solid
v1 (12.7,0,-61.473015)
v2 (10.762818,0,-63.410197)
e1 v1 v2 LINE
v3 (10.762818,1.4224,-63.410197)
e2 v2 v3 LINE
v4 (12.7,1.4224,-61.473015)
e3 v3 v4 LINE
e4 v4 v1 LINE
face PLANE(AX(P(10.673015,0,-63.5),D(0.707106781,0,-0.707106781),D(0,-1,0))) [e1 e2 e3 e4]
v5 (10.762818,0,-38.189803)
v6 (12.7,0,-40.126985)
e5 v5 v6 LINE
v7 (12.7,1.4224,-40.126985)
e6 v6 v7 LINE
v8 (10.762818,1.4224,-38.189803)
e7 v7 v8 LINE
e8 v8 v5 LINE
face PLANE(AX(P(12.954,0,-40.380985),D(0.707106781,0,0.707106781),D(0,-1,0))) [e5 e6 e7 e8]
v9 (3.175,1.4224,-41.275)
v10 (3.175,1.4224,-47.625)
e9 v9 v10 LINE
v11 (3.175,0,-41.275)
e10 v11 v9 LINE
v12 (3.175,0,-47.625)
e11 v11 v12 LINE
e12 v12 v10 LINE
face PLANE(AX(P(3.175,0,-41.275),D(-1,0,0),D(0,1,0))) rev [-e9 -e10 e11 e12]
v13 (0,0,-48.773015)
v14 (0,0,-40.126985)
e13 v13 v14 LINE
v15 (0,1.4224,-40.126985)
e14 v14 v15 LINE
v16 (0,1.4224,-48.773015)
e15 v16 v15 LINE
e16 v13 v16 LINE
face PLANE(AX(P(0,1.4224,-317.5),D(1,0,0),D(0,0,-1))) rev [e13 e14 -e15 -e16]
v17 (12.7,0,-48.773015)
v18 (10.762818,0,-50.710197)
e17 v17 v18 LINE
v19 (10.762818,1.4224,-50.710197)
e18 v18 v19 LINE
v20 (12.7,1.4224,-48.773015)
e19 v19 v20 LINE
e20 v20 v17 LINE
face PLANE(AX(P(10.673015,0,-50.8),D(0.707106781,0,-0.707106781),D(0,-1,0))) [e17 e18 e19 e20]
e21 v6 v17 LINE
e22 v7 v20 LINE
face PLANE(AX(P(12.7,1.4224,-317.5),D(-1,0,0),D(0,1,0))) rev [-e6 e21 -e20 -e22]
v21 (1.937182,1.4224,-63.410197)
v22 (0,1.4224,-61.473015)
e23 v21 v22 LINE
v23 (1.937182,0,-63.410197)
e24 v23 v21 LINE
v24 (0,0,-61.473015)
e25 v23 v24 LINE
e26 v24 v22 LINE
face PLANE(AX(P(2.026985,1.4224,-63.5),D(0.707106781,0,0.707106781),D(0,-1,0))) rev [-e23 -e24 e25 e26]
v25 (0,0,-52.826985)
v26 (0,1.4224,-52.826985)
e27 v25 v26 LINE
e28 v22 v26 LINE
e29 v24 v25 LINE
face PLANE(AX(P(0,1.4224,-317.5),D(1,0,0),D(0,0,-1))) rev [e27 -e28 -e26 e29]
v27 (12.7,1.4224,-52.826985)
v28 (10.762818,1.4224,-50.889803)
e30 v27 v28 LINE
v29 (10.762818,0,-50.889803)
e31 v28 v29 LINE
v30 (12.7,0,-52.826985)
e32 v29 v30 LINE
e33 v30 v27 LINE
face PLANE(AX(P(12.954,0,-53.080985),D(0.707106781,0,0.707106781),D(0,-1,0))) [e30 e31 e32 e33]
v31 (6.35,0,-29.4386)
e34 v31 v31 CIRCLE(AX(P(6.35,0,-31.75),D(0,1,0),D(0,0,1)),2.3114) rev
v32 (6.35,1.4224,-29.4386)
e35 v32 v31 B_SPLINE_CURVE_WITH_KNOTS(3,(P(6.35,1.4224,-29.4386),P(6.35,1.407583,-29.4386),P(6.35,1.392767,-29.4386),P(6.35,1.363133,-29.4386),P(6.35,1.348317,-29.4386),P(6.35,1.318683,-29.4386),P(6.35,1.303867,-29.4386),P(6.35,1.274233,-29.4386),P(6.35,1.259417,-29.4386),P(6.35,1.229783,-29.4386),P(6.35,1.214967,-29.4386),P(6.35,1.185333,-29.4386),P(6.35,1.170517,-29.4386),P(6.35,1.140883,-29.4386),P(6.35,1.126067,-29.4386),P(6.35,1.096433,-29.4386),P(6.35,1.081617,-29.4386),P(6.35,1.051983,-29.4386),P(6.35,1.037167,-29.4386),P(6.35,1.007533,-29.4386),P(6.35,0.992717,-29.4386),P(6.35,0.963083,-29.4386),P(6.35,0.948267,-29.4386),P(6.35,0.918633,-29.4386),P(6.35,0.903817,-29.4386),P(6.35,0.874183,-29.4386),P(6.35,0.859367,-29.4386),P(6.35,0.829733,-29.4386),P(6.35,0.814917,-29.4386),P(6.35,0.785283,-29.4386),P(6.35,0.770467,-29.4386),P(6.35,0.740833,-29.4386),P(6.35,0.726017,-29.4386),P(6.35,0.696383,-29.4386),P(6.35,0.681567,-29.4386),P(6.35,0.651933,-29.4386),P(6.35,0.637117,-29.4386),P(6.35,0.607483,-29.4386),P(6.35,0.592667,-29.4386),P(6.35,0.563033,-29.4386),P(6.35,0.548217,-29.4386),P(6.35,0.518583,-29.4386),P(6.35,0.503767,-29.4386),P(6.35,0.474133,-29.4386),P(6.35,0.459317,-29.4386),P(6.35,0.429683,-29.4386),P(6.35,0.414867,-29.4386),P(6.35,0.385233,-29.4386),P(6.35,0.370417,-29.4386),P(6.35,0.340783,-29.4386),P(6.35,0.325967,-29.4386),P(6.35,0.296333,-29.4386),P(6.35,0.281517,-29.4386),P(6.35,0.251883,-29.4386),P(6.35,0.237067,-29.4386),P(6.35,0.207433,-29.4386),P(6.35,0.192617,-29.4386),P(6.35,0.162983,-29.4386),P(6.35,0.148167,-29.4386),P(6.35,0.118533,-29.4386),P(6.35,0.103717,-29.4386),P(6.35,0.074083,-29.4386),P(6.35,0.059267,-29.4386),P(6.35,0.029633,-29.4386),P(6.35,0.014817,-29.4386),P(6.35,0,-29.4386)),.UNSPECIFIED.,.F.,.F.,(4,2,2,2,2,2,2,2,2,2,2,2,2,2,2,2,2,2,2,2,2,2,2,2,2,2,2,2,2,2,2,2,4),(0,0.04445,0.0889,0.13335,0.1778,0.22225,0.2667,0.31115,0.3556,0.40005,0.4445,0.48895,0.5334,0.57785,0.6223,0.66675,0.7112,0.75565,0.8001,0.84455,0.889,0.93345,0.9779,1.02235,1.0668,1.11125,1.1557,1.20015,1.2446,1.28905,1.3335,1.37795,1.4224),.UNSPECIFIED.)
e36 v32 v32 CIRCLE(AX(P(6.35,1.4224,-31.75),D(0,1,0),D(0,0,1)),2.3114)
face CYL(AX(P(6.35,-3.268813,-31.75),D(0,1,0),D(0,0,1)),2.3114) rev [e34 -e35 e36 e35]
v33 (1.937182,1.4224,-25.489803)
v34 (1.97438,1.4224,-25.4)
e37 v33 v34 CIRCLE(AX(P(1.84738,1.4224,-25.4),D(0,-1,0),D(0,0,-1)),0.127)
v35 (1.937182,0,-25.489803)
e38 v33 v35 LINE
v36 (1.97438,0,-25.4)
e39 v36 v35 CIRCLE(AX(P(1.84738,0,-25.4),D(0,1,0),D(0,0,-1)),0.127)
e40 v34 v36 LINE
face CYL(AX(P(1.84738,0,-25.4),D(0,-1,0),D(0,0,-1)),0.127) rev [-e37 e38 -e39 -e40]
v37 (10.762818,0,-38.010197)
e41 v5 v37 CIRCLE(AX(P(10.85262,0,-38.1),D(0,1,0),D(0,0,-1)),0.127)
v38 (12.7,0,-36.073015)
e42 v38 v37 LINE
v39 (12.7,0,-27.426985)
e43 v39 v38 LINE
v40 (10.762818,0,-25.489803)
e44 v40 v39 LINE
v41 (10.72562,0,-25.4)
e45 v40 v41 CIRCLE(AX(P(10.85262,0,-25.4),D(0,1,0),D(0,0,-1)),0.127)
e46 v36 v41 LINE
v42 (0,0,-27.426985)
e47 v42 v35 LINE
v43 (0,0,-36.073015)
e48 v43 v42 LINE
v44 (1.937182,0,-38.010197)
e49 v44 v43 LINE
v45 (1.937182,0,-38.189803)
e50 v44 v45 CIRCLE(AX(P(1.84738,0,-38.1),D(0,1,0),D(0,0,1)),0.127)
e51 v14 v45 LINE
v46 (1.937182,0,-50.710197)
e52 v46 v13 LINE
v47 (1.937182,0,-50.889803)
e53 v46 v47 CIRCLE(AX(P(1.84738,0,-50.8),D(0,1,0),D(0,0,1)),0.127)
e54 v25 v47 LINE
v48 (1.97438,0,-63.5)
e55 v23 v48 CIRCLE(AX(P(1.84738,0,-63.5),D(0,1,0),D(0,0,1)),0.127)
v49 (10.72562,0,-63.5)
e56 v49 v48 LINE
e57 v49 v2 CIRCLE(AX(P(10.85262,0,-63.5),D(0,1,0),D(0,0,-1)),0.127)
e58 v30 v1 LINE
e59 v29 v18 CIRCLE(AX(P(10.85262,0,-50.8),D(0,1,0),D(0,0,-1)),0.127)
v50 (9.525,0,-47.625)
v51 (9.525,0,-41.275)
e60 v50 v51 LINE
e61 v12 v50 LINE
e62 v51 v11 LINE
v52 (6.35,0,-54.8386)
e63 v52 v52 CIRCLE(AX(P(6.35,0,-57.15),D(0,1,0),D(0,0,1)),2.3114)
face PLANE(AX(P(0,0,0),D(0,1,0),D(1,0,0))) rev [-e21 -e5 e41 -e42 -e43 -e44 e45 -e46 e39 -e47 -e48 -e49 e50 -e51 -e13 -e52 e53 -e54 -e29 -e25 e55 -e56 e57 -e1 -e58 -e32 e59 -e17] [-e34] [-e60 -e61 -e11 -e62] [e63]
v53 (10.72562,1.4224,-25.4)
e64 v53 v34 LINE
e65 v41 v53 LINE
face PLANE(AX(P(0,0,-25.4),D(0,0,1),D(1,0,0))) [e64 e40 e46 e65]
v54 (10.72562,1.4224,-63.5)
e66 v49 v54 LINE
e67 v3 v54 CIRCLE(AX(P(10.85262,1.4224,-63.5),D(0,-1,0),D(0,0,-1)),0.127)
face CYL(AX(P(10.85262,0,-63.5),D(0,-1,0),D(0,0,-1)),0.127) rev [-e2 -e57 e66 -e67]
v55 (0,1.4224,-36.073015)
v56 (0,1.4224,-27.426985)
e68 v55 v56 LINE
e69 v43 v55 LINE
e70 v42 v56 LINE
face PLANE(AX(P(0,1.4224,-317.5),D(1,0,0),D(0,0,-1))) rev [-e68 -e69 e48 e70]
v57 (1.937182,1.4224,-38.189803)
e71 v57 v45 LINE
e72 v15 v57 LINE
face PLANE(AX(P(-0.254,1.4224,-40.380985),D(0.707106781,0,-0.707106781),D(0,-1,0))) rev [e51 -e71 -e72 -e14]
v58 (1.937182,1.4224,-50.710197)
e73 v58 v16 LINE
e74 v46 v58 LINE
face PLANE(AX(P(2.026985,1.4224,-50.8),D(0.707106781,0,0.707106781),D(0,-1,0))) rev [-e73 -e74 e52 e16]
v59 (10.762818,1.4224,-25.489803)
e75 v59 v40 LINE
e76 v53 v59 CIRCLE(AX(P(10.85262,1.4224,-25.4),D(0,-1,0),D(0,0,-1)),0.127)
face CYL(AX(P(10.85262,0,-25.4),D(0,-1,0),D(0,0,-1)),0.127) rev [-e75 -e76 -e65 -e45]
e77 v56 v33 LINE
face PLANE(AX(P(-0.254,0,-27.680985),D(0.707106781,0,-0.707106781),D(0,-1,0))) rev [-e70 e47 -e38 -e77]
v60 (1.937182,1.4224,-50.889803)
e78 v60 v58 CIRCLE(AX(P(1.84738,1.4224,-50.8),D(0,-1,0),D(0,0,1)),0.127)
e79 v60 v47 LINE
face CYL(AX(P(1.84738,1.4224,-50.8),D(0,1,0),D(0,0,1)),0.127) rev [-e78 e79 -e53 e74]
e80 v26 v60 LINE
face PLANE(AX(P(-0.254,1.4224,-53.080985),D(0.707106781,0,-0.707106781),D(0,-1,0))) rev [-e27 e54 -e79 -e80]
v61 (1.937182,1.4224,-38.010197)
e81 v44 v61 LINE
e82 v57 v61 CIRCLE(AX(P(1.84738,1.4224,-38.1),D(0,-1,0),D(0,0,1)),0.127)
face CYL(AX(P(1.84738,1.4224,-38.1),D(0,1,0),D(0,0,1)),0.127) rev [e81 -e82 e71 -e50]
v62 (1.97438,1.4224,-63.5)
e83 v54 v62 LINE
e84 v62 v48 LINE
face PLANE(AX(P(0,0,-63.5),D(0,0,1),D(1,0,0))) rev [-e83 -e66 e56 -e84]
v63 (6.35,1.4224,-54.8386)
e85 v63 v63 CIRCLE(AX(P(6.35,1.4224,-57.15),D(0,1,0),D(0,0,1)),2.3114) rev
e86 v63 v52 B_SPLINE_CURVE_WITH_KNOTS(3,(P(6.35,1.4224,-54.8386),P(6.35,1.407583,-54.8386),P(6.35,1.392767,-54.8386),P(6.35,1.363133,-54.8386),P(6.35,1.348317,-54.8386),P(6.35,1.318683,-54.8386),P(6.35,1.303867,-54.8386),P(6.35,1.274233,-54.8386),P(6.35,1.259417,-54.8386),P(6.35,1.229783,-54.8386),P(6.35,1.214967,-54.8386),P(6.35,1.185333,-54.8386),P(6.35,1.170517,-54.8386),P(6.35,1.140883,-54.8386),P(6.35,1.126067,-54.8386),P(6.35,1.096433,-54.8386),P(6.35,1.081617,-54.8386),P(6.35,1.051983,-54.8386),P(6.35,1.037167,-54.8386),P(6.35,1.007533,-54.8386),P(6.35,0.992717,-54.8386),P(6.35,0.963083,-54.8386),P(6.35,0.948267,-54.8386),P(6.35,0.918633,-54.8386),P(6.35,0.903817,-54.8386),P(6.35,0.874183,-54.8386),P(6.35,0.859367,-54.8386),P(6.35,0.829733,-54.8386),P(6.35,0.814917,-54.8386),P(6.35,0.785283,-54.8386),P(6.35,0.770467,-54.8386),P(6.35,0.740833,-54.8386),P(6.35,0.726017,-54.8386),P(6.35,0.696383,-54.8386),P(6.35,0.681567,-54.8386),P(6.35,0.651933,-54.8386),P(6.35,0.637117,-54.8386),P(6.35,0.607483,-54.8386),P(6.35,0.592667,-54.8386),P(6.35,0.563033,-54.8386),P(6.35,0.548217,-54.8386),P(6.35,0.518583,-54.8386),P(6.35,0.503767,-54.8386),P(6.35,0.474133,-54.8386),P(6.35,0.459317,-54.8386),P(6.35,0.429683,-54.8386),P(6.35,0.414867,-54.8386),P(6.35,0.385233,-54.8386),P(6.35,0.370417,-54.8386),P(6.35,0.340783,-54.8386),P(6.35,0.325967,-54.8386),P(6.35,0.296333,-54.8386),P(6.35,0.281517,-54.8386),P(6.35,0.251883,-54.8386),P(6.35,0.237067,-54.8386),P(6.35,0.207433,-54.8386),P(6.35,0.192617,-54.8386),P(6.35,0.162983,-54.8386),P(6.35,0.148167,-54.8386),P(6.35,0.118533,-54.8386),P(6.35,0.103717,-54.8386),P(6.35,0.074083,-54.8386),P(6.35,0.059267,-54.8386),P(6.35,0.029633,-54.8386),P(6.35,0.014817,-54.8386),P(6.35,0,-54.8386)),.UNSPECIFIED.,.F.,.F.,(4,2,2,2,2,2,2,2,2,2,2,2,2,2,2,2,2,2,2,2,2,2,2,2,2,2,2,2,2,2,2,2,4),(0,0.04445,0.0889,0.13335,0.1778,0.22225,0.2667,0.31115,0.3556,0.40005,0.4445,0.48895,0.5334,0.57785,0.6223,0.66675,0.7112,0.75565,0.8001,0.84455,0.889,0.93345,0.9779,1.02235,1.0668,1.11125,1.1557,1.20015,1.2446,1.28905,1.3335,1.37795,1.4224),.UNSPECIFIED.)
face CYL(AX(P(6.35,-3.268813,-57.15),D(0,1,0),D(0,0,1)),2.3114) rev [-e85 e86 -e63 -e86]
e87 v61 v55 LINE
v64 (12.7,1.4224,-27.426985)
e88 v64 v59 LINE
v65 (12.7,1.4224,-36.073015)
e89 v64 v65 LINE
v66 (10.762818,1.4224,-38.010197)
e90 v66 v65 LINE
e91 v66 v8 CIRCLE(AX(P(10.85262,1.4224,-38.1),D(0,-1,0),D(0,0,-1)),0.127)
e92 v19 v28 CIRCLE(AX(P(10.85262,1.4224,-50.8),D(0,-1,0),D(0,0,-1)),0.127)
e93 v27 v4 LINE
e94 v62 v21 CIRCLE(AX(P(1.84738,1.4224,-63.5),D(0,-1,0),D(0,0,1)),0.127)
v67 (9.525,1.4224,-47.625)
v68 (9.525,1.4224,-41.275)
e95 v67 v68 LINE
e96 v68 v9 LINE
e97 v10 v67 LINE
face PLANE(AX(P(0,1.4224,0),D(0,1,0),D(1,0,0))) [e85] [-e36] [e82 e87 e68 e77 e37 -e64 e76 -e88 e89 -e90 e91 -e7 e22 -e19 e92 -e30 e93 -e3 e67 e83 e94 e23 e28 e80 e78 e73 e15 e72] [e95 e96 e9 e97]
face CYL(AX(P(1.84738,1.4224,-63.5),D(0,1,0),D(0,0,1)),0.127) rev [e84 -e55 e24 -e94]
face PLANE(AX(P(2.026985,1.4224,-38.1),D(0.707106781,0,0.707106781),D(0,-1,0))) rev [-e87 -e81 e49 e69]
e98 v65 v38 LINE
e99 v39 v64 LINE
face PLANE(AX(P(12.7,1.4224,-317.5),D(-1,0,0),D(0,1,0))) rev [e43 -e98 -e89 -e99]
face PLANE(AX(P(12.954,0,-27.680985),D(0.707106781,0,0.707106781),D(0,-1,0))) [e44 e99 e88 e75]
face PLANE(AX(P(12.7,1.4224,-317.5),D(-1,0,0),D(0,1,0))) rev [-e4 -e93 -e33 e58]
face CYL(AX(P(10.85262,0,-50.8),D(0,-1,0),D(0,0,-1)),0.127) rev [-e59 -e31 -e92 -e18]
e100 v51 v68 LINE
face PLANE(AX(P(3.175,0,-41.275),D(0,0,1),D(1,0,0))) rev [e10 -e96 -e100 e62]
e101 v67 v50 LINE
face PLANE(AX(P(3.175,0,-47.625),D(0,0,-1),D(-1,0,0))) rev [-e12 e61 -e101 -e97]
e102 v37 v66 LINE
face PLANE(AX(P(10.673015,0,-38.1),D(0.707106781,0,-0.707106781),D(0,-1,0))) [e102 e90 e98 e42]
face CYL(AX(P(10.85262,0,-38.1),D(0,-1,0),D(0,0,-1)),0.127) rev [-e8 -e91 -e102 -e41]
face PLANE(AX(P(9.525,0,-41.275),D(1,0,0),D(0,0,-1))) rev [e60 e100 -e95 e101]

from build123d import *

# Parameters (mm, degrees)
STOCK_HS_LOCK_BAR_3_LONG_1_OUTLINE_W = 6.35
STOCK_HS_LOCK_BAR_3_LONG_1_OUTLINE_H = 6.35
STOCK_HS_LOCK_BAR_3_LONG_1_DEPTH     = 1.4224
BOSS_EXTRUDE1_START                  = -1.4224
BOSS_EXTRUDE1_DEPTH                  = 1.4224


# Read off the part's stored shape, not the designer's step: Stock-HS lock bar 3 long-1
with BuildPart() as part:
    # Stock-HS lock bar 3 long-1 outline → Stock-HS lock bar 3 long-1 (new body)
    with BuildSketch(Plane(origin=(0, 0, 0), x_dir=(1, 0, 0), z_dir=(0, 1, 0))):
        with BuildLine():
            Line((12.7, 36.073014945), (10.762817506, 38.010197439))
            ThreePointArc((10.762817506, 38.010197439), (10.725620068, 38.1), (10.762817506, 38.189802561))
            Line((10.762817506, 38.189802561), (12.7, 40.126985055))
            Line((12.7, 40.126985055), (12.7, 48.773014945))
            Line((12.7, 48.773014945), (10.762817506, 50.710197439))
            ThreePointArc((10.762817506, 50.710197439), (10.725620068, 50.8), (10.762817506, 50.889802561))
            Line((10.762817506, 50.889802561), (12.7, 52.826985055))
            Line((12.7, 52.826985055), (12.7, 61.473014945))
            Line((12.7, 61.473014945), (10.762817506, 63.410197439))
            ThreePointArc((10.762817506, 63.410197439), (10.735287367, 63.451399204), (10.725620068, 63.5))
            Line((10.725620068, 63.5), (1.974379932, 63.5))
            ThreePointArc((1.974379932, 63.5), (1.964712633, 63.451399204), (1.937182494, 63.410197439))
            Line((1.937182494, 63.410197439), (0, 61.473014945))
            Line((0, 61.473014945), (0, 52.826985055))
            Line((0, 52.826985055), (1.937182494, 50.889802561))
            ThreePointArc((1.937182494, 50.889802561), (1.974379932, 50.8), (1.937182494, 50.710197439))
            Line((1.937182494, 50.710197439), (0, 48.773014945))
            Line((0, 48.773014945), (0, 40.126985055))
            Line((0, 40.126985055), (1.937182494, 38.189802561))
            ThreePointArc((1.937182494, 38.189802561), (1.974379932, 38.1), (1.937182494, 38.010197439))
            Line((1.937182494, 38.010197439), (0, 36.073014945))
            Line((0, 36.073014945), (0, 27.426985055))
            Line((0, 27.426985055), (1.937182494, 25.489802561))
            ThreePointArc((1.937182494, 25.489802561), (1.964712633, 25.448600796), (1.974379932, 25.4))
            Line((1.974379932, 25.4), (10.725620068, 25.4))
            ThreePointArc((10.725620068, 25.4), (10.735287367, 25.448600796), (10.762817506, 25.489802561))
            Line((10.762817506, 25.489802561), (12.7, 27.426985055))
            Line((12.7, 27.426985055), (12.7, 36.073014945))
        make_face()
        with BuildLine():
            Line((4.0386, 29.9466), (4.0386, 33.5534))
            ThreePointArc((4.0386, 33.5534), (4.187389755, 33.912610245), (4.5466, 34.0614))
            Line((4.5466, 34.0614), (8.1534, 34.0614))
            ThreePointArc((8.1534, 34.0614), (8.512610245, 33.912610245), (8.6614, 33.5534))
            Line((8.6614, 33.5534), (8.6614, 29.9466))
            ThreePointArc((8.6614, 29.9466), (8.512610245, 29.587389755), (8.1534, 29.4386))
            Line((8.1534, 29.4386), (4.5466, 29.4386))
            ThreePointArc((4.5466, 29.4386), (4.187389755, 29.587389755), (4.0386, 29.9466))
        make_face(mode=Mode.SUBTRACT)
        with Locations((6.35, 44.45)):
            Rectangle(STOCK_HS_LOCK_BAR_3_LONG_1_OUTLINE_W, STOCK_HS_LOCK_BAR_3_LONG_1_OUTLINE_H, mode=Mode.SUBTRACT)
        with BuildLine():
            Line((4.0386, 55.3466), (4.0386, 58.9534))
            ThreePointArc((4.0386, 58.9534), (4.187389755, 59.312610245), (4.5466, 59.4614))
            Line((4.5466, 59.4614), (8.1534, 59.4614))
            ThreePointArc((8.1534, 59.4614), (8.512610245, 59.312610245), (8.6614, 58.9534))
            Line((8.6614, 58.9534), (8.6614, 55.3466))
            ThreePointArc((8.6614, 55.3466), (8.512610245, 54.987389755), (8.1534, 54.8386))
            Line((8.1534, 54.8386), (4.5466, 54.8386))
            ThreePointArc((4.5466, 54.8386), (4.187389755, 54.987389755), (4.0386, 55.3466))
        make_face(mode=Mode.SUBTRACT)
    extrude(amount=STOCK_HS_LOCK_BAR_3_LONG_1_DEPTH)

    # Sketch1 → Boss-Extrude1 (add)
    with BuildSketch(Plane(origin=(0, 1.4224, 0), x_dir=(1, 0, 0), z_dir=(0, 1, 0)).offset(BOSS_EXTRUDE1_START)):
        with BuildLine():
            Line((4.0386, 33.5534), (4.0386, 31.75))
            ThreePointArc((4.0386, 31.75), (4.715593386, 33.384406614), (6.35, 34.0614))
            Line((6.35, 34.0614), (4.5466, 34.0614))
            ThreePointArc((4.5466, 34.0614), (4.187389755, 33.912610245), (4.0386, 33.5534))
        make_face()
        with BuildLine():
            Line((8.1534, 34.0614), (6.35, 34.0614))
            ThreePointArc((6.35, 34.0614), (7.984406614, 33.384406614), (8.6614, 31.75))
            Line((8.6614, 31.75), (8.6614, 33.5534))
            ThreePointArc((8.6614, 33.5534), (8.512610245, 33.912610245), (8.1534, 34.0614))
        make_face()
        with BuildLine():
            ThreePointArc((8.6614, 31.75), (7.984406614, 30.115593386), (6.35, 29.4386))
            Line((6.35, 29.4386), (8.1534, 29.4386))
            ThreePointArc((8.1534, 29.4386), (8.512610245, 29.587389755), (8.6614, 29.9466))
            Line((8.6614, 29.9466), (8.6614, 31.75))
        make_face()
        with BuildLine():
            Line((4.0386, 31.75), (4.0386, 29.9466))
            ThreePointArc((4.0386, 29.9466), (4.187389755, 29.587389755), (4.5466, 29.4386))
            Line((4.5466, 29.4386), (6.35, 29.4386))
            ThreePointArc((6.35, 29.4386), (4.715593386, 30.115593386), (4.0386, 31.75))
        make_face()
        with BuildLine():
            ThreePointArc((8.6614, 57.15), (7.984406614, 55.515593386), (6.35, 54.8386))
            Line((6.35, 54.8386), (8.1534, 54.8386))
            ThreePointArc((8.1534, 54.8386), (8.512610245, 54.987389755), (8.6614, 55.3466))
            Line((8.6614, 55.3466), (8.6614, 57.15))
        make_face()
        with BuildLine():
            ThreePointArc((4.0386, 55.3466), (4.187389755, 54.987389755), (4.5466, 54.8386))
            Line((4.5466, 54.8386), (6.35, 54.8386))
            ThreePointArc((6.35, 54.8386), (4.715593386, 55.515593386), (4.0386, 57.15))
            Line((4.0386, 57.15), (4.0386, 55.3466))
        make_face()
        with BuildLine():
            ThreePointArc((6.350000002, 59.4614), (7.984406615, 58.784406613), (8.6614, 57.15))
            Line((8.6614, 57.15), (8.6614, 58.9534))
            ThreePointArc((8.6614, 58.9534), (8.512610245, 59.312610245), (8.1534, 59.4614))
            Line((8.1534, 59.4614), (6.350000002, 59.4614))
        make_face()
        with BuildLine():
            Line((4.0386, 58.9534), (4.0386, 57.15))
            ThreePointArc((4.0386, 57.15), (4.715593387, 58.784406615), (6.350000002, 59.4614))
            Line((6.350000002, 59.4614), (4.5466, 59.4614))
            ThreePointArc((4.5466, 59.4614), (4.187389755, 59.312610245), (4.0386, 58.9534))
        make_face()
    extrude(amount=BOSS_EXTRUDE1_DEPTH)


solid = part.part
